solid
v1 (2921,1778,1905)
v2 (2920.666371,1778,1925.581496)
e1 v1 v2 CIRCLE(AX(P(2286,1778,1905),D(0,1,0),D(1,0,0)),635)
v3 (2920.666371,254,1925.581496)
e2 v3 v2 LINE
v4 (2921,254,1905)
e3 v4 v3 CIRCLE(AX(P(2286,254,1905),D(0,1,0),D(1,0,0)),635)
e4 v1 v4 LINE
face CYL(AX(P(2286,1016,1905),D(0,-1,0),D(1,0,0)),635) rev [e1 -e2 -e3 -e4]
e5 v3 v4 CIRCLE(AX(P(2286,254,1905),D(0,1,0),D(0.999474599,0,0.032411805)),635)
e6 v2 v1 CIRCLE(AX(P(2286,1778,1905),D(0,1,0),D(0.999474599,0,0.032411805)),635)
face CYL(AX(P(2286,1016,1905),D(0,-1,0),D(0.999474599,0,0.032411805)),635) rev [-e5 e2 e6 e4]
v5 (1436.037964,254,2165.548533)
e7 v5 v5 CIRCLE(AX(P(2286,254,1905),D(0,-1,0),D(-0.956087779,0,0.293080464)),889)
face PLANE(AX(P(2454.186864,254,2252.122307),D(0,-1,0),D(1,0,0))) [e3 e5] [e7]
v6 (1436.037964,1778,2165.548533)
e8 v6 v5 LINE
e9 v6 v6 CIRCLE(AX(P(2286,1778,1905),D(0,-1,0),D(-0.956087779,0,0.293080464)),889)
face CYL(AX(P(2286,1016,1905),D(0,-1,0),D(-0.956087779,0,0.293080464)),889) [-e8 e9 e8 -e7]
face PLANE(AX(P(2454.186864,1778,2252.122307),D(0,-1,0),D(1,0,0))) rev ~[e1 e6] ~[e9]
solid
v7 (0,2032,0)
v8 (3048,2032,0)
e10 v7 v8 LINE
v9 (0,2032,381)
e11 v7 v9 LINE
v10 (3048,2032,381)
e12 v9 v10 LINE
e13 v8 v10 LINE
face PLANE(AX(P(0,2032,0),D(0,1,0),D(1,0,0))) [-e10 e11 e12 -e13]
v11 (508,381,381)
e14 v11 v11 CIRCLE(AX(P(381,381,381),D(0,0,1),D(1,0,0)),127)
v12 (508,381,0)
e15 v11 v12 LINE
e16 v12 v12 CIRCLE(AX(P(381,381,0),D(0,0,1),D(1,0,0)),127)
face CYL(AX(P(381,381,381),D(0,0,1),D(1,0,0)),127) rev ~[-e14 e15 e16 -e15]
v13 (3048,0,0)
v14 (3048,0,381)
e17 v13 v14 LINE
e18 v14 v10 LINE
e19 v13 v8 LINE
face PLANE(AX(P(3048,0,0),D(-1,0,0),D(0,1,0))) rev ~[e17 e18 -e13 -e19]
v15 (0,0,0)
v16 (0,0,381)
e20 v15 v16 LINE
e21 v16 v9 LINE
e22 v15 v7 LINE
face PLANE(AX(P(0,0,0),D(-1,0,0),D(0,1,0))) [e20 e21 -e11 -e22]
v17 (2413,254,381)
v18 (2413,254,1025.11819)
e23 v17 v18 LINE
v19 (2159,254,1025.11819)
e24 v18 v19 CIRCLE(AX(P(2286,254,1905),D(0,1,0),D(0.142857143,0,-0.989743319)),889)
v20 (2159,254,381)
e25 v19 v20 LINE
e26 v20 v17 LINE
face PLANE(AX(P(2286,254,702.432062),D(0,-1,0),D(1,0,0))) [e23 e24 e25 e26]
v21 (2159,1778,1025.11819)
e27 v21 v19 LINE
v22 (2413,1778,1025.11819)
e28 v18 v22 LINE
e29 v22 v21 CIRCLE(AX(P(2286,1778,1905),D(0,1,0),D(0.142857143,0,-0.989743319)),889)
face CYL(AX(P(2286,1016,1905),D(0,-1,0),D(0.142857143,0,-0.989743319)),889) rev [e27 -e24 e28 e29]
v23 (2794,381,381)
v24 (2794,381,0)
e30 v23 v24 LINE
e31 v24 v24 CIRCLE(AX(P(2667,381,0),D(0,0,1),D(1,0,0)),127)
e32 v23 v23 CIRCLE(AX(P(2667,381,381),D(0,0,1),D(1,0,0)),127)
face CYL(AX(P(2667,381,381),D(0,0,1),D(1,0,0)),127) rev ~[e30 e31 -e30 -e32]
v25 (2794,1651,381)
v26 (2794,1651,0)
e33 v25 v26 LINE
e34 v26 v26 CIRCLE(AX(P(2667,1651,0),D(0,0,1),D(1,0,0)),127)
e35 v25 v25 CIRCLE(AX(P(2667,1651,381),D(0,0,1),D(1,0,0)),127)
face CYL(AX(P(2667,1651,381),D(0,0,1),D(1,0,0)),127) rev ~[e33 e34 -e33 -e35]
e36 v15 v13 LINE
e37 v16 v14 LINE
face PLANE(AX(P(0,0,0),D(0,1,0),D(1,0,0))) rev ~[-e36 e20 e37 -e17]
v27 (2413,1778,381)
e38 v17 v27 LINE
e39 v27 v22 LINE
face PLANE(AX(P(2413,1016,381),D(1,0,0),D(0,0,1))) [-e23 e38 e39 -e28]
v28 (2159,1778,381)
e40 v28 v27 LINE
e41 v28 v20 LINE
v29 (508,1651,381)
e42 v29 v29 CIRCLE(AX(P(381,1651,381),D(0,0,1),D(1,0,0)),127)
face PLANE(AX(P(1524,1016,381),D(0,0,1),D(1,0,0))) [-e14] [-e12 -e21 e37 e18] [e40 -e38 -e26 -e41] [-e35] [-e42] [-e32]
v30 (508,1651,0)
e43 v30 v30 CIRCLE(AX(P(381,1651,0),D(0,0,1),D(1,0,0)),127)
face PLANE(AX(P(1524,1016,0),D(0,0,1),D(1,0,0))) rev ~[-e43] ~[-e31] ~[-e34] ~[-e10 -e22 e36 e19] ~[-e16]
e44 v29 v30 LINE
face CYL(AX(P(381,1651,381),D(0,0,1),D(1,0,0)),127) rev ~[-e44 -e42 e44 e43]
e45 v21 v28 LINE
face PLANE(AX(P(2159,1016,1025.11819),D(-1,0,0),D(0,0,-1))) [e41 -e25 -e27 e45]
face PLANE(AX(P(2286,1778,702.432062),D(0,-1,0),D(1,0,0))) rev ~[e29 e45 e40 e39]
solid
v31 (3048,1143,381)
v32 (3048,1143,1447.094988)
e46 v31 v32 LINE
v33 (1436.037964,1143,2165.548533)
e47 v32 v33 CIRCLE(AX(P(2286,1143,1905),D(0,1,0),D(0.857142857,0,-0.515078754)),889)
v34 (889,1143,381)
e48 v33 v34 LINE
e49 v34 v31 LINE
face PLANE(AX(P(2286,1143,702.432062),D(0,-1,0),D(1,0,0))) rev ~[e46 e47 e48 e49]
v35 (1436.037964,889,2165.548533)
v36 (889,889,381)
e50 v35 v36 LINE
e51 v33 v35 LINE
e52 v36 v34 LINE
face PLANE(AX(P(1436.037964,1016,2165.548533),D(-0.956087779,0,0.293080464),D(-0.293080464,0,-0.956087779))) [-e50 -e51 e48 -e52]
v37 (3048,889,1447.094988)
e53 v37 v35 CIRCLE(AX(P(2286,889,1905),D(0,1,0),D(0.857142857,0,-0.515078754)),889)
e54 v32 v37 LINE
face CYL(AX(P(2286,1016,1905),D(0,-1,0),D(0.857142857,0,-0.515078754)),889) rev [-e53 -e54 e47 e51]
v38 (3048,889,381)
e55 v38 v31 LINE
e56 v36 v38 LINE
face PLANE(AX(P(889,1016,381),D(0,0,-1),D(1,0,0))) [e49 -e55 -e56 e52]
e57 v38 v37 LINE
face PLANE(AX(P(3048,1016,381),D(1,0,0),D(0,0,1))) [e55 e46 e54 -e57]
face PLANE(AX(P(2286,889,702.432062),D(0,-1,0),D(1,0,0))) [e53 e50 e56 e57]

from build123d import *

# Parameters (mm, degrees)
F0_W          = 3048
F0_H          = 2032
F1_DEPTH      = 381
F2_R          = 127
F3_DEPTH      = 381.001
F6_DEPTH      = 762
F6_DEPTH_BACK = 762
F7_DEPTH      = 127
F7_DEPTH_BACK = 127
F8_DEPTH      = 762
F8_DEPTH_BACK = 762


# Not quite as in the source:
# - a feature names something its author has since deleted; it is built from what else it names


with BuildPart() as f1:
    # F0 (on Top) → F1 (new body)
    with BuildSketch(Plane.XY):
        with Locations((1524, 1016)):
            Rectangle(F0_W, F0_H)
    extrude(amount=F1_DEPTH)

    # F2 (on face) → F3 (cut, through all)
    with BuildSketch(Plane.XY.offset(381)):
        with Locations((381, 381)):
            Circle(F2_R)
        with Locations((2667, 1651)):
            Circle(F2_R)
        with Locations((2667, 381)):
            Circle(F2_R)
        with Locations((381, 1651)):
            Circle(F2_R)
    extrude(amount=-F3_DEPTH, mode=Mode.SUBTRACT)

    # F5 (on offset) → F8 (join, two sides)
    with BuildSketch(Plane.XZ.offset(-1016)) as f8_sk:
        with BuildLine():
            ThreePointArc((2413, 1025.118189755), (2286, 1016), (2159, 1025.118189755))
            Line((2159, 1025.118189755), (2159, 381))
            Line((2159, 381), (2413, 381))
            Line((2413, 381), (2413, 1025.118189755))
        make_face()
    extrude(amount=F8_DEPTH)
    extrude(f8_sk.sketch, amount=-F8_DEPTH_BACK)


with BuildPart() as f6:
    # F5 (on offset) → F6 (new body, two sides)
    with BuildSketch(Plane.XZ.offset(-1016)) as f6_sk:
        with BuildLine():
            ThreePointArc((3048, 1447.094988016), (3142.6618352652, 1667.4047559398), (3175, 1905))
            ThreePointArc((3175, 1905), (2417.7284143182, 2784.1863425129), (1436.0379643167, 2165.5485327097))
            Line((1436.0379643167, 2165.5485327097), (1690.1354455927, 2124.4776362207))
            ThreePointArc((1690.1354455927, 2124.4776362207), (2387.3228201241, 2531.8641687974), (2920.6663706387, 1925.5814960652))
            Line((2920.6663706387, 1925.5814960652), (3048, 1905))
            Line((3048, 1905), (3048, 1447.094988016))
        make_face()
        with BuildLine():
            Line((1690.1354455927, 2124.4776362207), (1436.0379643167, 2165.5485327097))
            ThreePointArc((1436.0379643167, 2165.5485327097), (1535.1611047805, 1429.0147550338), (2159, 1025.118189755))
            ThreePointArc((2159, 1025.118189755), (2286, 1016), (2413, 1025.118189755))
            ThreePointArc((2413, 1025.118189755), (2778.0328795595, 1164.5780625668), (3048, 1447.094988016))
            Line((3048, 1447.094988016), (3048, 1905))
            Line((3048, 1905), (2920.6663706387, 1925.5814960652))
            ThreePointArc((2920.6663706387, 1925.5814960652), (2920.9165871812, 1915.2920999902), (2921, 1905))
            ThreePointArc((2921, 1905), (2174.5302553349, 1279.8604187669), (1690.1354455927, 2124.4776362207))
        make_face()
    extrude(amount=F6_DEPTH)
    extrude(f6_sk.sketch, amount=-F6_DEPTH_BACK)


with BuildPart() as f7:
    # F5 (on offset) → F7 (new body, two sides)
    with BuildSketch(Plane.XZ.offset(-1016)) as f7_sk:
        with BuildLine():
            ThreePointArc((2413, 1025.118189755), (2286, 1016), (2159, 1025.118189755))
            Line((2159, 1025.118189755), (2159, 381))
            Line((2159, 381), (2413, 381))
            Line((2413, 381), (2413, 1025.118189755))
        make_face()
        with BuildLine():
            Line((3048, 381), (3048, 1447.094988016))
            ThreePointArc((3048, 1447.094988016), (2778.0328795595, 1164.5780625668), (2413, 1025.118189755))
            Line((2413, 1025.118189755), (2413, 381))
            Line((2413, 381), (3048, 381))
        make_face()
        with BuildLine():
            ThreePointArc((2159, 1025.118189755), (1535.1611047805, 1429.0147550338), (1436.0379643167, 2165.5485327097))
            Line((1436.0379643167, 2165.5485327097), (889, 381))
            Line((889, 381), (2159, 381))
            Line((2159, 381), (2159, 1025.118189755))
        make_face()
    extrude(amount=F7_DEPTH)
    extrude(f7_sk.sketch, amount=-F7_DEPTH_BACK)


solid = Compound([f1.part, f6.part, f7.part])
